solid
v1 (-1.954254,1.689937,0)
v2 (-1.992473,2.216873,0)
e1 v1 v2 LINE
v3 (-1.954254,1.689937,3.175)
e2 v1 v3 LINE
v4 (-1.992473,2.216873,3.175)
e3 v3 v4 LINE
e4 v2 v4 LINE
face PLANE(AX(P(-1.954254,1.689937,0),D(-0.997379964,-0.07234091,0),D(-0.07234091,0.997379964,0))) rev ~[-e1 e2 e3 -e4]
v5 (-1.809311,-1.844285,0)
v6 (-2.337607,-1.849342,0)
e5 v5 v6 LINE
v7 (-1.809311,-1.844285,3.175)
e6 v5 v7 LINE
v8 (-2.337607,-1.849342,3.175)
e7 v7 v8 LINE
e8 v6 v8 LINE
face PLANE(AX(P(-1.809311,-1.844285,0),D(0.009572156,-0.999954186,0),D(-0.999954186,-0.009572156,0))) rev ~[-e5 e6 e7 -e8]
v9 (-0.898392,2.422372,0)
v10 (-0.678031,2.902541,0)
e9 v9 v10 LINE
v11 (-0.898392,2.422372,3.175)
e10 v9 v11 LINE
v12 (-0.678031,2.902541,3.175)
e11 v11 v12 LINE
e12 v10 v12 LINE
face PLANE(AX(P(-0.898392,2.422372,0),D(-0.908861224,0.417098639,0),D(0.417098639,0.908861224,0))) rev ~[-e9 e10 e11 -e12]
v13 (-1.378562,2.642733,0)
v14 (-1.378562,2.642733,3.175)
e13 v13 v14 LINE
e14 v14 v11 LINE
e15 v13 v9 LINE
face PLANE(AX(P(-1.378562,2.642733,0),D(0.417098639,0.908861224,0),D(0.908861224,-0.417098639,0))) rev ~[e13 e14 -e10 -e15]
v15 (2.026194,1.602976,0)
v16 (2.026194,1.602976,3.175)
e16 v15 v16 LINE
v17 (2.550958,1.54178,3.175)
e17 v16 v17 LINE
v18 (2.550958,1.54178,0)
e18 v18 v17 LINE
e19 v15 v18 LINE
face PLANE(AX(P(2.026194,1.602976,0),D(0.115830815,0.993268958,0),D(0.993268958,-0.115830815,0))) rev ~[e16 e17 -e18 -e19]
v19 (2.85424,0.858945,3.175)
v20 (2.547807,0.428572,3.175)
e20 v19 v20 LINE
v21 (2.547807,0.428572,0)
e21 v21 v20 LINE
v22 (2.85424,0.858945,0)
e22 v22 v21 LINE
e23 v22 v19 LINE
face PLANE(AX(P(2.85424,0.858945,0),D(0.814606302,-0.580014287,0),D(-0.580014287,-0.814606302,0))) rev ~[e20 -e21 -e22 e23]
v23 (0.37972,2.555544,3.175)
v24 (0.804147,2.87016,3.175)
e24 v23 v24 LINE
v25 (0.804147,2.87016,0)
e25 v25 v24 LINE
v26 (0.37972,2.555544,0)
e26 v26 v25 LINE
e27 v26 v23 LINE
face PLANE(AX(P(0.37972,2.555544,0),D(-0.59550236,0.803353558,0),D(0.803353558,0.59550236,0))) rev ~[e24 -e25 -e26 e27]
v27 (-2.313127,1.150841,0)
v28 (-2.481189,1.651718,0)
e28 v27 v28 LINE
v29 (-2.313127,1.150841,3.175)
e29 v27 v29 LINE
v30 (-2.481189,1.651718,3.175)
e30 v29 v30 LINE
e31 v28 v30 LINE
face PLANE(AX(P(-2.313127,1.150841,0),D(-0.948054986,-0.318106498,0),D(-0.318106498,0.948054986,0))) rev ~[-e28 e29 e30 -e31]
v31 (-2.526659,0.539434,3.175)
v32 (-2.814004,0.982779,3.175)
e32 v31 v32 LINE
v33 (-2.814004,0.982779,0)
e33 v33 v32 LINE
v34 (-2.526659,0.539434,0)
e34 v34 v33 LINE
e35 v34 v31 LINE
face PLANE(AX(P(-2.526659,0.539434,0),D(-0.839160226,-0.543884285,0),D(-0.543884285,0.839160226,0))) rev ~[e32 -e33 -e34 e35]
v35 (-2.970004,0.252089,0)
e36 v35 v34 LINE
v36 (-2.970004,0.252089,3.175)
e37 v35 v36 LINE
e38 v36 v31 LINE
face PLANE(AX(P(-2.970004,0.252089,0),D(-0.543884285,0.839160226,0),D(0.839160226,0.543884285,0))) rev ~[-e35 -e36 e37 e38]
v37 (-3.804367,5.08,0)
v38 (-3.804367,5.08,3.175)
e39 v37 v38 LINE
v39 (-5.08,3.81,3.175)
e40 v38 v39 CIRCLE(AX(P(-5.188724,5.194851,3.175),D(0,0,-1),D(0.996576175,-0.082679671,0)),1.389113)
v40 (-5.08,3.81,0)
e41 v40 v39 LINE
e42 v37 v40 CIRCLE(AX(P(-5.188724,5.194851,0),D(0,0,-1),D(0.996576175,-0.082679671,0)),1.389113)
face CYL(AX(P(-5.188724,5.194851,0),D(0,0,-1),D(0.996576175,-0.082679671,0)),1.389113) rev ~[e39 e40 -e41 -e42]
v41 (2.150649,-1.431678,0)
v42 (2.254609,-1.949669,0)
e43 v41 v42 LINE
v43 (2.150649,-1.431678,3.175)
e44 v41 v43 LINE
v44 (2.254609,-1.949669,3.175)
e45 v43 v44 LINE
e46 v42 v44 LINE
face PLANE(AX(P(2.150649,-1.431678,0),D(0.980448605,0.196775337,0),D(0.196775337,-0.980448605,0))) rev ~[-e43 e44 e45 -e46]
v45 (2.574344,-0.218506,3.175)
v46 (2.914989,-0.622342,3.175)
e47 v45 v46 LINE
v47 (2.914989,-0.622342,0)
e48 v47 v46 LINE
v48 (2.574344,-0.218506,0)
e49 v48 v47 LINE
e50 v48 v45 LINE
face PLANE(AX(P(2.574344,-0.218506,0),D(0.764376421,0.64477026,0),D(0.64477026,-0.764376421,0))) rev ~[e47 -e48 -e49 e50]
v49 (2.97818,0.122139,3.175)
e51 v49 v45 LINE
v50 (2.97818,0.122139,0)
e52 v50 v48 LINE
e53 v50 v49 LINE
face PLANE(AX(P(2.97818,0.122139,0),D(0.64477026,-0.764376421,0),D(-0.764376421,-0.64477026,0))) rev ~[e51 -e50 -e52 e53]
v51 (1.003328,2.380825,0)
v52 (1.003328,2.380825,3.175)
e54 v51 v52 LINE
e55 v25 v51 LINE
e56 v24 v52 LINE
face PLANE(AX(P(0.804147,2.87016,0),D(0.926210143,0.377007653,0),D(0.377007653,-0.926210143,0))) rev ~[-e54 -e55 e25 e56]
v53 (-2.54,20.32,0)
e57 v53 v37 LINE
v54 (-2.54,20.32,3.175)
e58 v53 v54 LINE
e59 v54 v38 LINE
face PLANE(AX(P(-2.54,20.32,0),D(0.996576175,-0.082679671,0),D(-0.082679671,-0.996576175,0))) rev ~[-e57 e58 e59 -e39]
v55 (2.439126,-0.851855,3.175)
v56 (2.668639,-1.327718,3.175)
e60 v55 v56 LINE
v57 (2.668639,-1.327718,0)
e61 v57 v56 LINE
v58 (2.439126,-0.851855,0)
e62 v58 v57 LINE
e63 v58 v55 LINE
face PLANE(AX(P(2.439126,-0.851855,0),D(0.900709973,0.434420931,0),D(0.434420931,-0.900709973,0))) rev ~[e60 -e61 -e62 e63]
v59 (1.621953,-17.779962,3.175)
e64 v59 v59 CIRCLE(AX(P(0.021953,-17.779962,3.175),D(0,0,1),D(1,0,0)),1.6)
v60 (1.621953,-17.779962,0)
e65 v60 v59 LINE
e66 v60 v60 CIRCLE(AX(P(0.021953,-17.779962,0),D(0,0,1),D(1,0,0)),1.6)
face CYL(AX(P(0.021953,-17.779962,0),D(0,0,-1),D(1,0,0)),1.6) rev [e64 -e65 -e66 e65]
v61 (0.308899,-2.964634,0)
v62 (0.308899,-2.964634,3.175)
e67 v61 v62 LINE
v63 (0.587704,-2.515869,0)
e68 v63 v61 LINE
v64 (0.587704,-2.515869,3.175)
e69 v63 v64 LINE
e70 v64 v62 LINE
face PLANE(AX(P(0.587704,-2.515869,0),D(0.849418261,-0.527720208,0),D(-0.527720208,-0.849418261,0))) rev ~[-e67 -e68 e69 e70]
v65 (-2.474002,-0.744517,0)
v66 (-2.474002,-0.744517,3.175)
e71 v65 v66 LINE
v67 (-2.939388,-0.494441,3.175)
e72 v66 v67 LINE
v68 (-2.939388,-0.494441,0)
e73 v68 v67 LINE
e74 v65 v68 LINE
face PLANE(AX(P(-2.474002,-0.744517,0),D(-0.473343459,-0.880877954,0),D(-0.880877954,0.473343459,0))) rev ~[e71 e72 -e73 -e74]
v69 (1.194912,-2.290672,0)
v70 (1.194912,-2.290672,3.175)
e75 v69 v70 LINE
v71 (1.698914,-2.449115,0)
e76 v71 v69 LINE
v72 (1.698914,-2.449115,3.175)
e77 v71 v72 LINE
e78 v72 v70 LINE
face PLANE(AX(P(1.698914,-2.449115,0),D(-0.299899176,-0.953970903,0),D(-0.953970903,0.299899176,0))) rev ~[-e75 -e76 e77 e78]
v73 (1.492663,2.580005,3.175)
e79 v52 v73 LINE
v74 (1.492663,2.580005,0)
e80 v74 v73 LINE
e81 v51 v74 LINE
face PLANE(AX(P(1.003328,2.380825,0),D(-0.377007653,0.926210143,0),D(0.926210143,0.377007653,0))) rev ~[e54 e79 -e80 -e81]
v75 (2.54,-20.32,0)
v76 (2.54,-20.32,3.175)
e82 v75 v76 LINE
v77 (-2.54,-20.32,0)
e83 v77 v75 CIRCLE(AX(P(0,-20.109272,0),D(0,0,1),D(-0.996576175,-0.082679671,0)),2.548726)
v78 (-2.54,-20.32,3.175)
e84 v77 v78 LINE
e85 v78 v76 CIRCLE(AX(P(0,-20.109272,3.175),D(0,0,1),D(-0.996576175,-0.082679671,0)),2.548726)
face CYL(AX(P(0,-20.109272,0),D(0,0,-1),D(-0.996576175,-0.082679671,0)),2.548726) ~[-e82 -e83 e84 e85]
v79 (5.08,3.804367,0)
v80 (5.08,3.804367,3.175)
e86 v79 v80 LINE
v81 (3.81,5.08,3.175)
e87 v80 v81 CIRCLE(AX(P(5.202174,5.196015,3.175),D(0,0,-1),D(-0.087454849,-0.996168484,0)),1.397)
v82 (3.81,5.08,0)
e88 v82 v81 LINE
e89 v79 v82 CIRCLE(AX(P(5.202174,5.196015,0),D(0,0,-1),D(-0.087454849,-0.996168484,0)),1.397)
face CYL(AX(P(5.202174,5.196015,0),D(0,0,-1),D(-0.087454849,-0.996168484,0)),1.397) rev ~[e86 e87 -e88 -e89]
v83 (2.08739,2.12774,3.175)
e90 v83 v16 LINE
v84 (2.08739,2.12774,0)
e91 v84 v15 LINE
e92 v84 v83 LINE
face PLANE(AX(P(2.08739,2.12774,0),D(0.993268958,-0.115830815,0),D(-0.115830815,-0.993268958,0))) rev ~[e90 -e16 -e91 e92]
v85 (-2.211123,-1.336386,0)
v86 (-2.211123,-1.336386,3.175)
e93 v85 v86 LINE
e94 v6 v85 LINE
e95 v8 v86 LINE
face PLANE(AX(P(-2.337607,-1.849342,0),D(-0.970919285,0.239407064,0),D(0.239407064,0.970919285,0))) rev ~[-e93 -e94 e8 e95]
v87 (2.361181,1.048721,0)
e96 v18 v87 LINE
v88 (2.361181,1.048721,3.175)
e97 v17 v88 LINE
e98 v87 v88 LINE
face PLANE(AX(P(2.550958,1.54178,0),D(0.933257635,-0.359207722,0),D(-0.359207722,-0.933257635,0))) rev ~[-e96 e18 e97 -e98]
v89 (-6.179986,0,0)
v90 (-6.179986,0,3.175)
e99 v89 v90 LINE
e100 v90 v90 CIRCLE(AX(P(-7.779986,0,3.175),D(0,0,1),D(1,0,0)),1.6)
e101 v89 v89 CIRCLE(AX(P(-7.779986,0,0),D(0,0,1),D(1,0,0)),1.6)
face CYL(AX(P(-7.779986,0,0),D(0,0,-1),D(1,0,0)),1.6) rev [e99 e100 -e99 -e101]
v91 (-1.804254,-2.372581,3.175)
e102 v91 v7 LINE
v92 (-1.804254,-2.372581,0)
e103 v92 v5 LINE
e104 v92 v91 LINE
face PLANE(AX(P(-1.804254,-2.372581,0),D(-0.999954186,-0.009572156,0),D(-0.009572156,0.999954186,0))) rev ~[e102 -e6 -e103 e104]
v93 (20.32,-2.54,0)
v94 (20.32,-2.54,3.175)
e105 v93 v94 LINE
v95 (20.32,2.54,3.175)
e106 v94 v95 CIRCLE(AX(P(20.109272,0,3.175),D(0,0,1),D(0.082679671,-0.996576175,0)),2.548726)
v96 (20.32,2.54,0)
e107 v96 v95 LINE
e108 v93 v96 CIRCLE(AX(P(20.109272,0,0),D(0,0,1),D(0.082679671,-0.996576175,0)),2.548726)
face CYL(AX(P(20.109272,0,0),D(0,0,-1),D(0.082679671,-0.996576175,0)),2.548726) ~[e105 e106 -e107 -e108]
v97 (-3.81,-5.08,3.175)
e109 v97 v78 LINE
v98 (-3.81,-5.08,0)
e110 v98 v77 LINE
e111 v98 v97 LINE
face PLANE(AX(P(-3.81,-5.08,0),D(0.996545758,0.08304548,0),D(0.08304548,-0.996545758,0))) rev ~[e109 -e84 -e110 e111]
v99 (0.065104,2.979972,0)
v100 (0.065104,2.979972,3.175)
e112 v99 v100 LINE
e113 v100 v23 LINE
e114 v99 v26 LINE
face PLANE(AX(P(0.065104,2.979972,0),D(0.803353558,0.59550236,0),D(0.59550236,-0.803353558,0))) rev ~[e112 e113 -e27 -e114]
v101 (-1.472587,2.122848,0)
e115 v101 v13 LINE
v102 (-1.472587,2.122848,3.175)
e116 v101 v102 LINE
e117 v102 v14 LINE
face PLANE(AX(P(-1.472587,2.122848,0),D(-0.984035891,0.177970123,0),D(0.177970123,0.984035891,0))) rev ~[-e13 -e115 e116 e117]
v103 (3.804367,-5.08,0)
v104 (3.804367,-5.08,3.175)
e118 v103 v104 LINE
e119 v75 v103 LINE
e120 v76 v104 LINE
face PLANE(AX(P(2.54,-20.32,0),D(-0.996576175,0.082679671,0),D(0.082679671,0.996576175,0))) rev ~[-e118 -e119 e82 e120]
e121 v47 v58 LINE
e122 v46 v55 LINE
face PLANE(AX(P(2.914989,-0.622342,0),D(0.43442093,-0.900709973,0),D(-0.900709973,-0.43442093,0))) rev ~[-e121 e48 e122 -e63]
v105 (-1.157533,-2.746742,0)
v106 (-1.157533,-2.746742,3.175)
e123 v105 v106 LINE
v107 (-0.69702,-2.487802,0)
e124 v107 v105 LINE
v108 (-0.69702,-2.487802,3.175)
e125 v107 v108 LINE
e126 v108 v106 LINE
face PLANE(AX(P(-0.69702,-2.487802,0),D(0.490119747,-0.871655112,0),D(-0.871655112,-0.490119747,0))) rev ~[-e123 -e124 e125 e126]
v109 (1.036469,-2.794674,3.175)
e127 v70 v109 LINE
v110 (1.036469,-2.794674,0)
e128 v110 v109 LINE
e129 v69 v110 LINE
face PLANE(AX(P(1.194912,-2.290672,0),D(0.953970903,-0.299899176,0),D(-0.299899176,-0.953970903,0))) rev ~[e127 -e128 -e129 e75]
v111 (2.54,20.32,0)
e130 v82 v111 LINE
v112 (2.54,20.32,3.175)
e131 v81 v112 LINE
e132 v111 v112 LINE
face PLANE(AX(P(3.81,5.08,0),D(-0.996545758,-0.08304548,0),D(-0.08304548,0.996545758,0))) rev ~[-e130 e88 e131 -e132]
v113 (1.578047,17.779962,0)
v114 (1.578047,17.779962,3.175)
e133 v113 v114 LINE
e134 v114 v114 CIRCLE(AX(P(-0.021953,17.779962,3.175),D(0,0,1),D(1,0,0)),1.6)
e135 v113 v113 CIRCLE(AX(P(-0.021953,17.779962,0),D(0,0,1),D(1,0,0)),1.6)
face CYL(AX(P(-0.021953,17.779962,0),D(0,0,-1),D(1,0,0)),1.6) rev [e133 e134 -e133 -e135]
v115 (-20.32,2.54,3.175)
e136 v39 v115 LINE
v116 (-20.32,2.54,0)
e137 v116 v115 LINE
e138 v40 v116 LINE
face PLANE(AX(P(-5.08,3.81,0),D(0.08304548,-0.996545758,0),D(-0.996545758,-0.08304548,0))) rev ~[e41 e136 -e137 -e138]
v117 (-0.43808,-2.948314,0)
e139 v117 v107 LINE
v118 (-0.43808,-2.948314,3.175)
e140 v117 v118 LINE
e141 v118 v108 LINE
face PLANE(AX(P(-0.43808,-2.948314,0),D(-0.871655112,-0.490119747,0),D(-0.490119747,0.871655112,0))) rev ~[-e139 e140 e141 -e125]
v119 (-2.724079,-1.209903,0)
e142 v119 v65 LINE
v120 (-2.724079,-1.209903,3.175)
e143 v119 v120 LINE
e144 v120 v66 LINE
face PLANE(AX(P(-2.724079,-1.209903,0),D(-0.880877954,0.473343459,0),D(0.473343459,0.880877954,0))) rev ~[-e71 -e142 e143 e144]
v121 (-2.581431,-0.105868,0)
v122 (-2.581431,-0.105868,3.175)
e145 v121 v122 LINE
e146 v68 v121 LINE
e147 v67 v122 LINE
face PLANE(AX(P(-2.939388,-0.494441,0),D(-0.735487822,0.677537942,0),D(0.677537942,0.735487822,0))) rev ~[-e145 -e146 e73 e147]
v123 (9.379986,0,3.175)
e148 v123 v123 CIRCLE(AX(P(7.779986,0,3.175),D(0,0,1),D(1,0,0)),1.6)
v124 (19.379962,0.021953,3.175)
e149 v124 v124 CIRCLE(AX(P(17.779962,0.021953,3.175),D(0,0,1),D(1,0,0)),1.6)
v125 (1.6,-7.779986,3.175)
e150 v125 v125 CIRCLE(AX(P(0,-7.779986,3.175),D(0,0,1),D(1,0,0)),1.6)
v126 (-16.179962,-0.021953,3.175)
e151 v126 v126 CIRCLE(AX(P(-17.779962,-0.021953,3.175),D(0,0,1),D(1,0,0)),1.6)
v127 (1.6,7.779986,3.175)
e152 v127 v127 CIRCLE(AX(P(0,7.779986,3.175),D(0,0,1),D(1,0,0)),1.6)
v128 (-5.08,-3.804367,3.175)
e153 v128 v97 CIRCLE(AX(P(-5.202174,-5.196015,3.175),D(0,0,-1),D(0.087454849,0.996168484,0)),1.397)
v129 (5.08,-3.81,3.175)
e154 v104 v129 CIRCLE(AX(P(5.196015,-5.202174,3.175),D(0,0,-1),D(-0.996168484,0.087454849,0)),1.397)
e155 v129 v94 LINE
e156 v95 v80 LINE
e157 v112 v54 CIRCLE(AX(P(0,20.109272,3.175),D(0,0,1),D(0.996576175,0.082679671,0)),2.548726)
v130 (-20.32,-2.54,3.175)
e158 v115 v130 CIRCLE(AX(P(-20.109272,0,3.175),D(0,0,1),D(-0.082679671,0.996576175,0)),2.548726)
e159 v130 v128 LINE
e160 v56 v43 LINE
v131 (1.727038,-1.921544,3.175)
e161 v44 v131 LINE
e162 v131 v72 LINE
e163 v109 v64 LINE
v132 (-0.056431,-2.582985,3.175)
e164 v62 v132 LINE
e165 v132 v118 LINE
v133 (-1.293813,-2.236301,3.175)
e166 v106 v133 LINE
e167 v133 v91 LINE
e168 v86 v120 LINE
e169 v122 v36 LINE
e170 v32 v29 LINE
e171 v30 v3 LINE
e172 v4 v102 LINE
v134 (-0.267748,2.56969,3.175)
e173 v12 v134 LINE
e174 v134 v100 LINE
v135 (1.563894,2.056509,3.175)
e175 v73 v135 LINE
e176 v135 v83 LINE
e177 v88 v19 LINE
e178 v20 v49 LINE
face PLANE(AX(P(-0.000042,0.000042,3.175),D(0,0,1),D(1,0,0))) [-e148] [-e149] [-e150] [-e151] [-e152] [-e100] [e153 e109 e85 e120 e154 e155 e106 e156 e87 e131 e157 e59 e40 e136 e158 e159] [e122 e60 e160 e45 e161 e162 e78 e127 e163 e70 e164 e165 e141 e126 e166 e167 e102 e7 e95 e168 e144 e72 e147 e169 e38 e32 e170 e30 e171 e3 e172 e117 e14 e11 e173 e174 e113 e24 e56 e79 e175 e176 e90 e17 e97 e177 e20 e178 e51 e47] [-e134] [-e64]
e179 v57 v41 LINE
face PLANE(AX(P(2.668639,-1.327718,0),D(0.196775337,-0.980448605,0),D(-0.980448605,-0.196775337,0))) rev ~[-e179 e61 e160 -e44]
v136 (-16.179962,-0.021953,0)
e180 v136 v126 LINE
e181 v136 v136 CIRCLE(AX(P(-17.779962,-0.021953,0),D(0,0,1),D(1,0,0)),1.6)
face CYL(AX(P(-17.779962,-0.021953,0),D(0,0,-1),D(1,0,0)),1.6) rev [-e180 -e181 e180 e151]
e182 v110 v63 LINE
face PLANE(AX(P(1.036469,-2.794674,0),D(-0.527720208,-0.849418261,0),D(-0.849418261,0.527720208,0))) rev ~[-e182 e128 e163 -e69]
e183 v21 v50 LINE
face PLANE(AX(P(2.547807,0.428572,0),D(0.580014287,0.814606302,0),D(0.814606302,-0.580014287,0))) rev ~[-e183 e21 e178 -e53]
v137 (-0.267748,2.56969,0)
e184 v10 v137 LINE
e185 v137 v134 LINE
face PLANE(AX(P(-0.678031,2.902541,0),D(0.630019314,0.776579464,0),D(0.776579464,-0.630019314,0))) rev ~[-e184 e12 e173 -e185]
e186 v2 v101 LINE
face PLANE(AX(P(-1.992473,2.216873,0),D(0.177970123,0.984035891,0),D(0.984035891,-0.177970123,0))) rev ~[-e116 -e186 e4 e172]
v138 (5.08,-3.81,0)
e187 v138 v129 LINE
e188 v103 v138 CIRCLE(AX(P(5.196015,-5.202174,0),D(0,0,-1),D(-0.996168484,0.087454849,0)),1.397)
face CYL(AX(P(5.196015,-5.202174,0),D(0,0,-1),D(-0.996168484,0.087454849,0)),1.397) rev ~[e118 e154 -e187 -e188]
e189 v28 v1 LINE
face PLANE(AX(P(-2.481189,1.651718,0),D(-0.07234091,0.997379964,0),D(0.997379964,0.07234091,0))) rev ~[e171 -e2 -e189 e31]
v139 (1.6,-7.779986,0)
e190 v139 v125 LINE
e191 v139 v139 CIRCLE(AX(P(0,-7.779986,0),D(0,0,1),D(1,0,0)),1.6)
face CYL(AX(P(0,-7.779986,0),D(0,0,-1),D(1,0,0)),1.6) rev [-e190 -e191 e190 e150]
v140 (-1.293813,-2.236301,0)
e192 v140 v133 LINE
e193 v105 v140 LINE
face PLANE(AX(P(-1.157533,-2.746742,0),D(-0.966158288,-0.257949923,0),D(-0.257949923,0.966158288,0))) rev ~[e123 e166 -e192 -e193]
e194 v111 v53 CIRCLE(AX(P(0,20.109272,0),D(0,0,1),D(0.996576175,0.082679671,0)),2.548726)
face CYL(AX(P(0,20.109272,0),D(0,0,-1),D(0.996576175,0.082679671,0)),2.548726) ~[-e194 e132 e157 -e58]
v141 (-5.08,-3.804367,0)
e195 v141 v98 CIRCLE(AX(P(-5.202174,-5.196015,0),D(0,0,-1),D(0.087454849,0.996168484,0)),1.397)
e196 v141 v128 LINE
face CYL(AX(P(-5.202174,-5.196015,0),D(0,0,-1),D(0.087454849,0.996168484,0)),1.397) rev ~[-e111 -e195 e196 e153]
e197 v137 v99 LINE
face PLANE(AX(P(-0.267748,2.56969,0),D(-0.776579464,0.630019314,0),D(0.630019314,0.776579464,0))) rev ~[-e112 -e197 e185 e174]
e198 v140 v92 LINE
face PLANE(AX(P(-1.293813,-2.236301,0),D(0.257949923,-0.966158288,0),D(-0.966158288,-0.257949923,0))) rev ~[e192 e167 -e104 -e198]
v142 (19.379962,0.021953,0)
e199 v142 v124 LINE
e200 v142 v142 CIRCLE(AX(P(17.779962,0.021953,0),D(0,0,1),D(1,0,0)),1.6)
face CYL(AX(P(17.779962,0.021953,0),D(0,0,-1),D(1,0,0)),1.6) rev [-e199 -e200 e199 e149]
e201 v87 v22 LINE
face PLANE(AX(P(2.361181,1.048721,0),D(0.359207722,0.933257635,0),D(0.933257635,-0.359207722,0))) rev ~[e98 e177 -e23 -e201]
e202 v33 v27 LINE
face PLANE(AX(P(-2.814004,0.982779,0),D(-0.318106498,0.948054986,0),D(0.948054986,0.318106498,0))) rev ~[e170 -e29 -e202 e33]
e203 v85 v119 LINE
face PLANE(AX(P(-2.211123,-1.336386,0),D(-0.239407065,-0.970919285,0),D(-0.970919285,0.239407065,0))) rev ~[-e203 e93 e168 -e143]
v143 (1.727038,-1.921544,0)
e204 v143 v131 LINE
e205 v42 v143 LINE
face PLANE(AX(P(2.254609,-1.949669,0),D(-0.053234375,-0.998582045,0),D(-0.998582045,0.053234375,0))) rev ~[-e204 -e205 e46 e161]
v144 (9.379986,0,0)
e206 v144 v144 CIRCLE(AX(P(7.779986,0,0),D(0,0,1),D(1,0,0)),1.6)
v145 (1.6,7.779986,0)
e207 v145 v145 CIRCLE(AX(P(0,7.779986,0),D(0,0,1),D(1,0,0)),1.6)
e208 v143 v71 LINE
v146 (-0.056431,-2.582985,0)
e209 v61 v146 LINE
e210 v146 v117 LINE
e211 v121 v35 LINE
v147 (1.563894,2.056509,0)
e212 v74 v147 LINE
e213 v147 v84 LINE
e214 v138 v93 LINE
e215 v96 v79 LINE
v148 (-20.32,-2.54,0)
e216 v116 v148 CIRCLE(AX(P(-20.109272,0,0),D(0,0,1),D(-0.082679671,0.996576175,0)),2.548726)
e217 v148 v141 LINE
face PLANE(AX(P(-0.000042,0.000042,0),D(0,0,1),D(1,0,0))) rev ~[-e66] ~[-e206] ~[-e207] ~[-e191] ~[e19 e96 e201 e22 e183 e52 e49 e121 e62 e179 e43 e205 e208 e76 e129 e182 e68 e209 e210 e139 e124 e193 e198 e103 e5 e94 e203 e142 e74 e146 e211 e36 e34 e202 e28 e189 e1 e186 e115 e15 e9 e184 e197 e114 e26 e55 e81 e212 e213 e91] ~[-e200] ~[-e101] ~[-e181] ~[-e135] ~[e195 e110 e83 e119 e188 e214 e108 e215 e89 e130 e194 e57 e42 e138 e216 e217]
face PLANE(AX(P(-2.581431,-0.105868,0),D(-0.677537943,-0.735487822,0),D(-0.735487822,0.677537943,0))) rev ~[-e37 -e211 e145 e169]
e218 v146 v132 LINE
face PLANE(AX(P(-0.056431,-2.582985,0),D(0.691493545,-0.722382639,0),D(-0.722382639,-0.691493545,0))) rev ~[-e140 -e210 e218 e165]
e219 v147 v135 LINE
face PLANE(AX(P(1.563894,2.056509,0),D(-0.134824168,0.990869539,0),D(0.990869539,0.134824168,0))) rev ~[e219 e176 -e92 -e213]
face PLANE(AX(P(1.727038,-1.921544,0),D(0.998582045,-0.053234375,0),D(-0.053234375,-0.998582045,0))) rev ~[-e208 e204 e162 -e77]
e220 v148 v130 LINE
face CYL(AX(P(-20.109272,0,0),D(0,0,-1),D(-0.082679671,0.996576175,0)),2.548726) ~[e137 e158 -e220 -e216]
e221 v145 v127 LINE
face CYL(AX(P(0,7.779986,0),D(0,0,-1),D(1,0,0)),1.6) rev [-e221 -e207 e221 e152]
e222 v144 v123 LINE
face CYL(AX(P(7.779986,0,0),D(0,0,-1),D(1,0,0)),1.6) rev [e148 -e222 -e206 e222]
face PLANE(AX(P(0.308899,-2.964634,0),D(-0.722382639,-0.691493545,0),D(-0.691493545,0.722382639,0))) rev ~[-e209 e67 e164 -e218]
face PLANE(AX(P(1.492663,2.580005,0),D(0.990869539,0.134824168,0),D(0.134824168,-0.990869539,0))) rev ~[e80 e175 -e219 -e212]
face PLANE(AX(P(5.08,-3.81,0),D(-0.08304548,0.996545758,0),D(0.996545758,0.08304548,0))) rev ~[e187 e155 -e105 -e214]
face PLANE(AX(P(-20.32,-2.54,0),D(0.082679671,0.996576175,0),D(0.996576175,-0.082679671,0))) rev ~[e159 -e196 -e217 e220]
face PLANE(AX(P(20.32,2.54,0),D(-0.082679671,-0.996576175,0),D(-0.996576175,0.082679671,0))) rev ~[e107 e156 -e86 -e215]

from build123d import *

# Parameters (mm, degrees)
F0_R     = 1.6
F1_DEPTH = 3.175


# Not quite as in the source:
# - a length typed as a fraction of an inch, garbled in the dataset ("3 / 203.2 mm" for 3/8 in), is restored


with BuildPart() as f1:
    # F0 (on Top) → F1 (new body)
    with BuildSketch(Plane.XY):
        with BuildLine():
            ThreePointArc((-3.8043671626, 5.08), (-4.2086486587, 4.2104292787), (-5.08, 3.81))
            Line((-5.08, 3.81), (-20.32, 2.54))
            ThreePointArc((-20.32, 2.54), (-22.6579985335, 0), (-20.32, -2.54))
            Line((-20.32, -2.54), (-5.08, -3.8043671626))
            ThreePointArc((-5.08, -3.8043671626), (-4.2121628624, -4.2103745873), (-3.81, -5.08))
            Line((-3.81, -5.08), (-2.54, -20.32))
            ThreePointArc((-2.54, -20.32), (0, -22.6579985335), (2.54, -20.32))
            Line((2.54, -20.32), (3.8043671626, -5.08))
            ThreePointArc((3.8043671626, -5.08), (4.2103745873, -4.2121628624), (5.08, -3.81))
            Line((5.08, -3.81), (20.32, -2.54))
            ThreePointArc((20.32, -2.54), (22.6579985335, 0), (20.32, 2.54))
            Line((20.32, 2.54), (5.08, 3.8043671626))
            ThreePointArc((5.08, 3.8043671626), (4.2121628624, 4.2103745873), (3.81, 5.08))
            Line((3.81, 5.08), (2.54, 20.32))
            ThreePointArc((2.54, 20.32), (0, 22.6579985335), (-2.54, 20.32))
            Line((-2.54, 20.32), (-3.8043671626, 5.08))
        make_face()
        with Locations((-17.7799620532, -0.0219527348)):
            Circle(F0_R, mode=Mode.SUBTRACT)
        with Locations((-7.7799861494, 0)):
            Circle(F0_R, mode=Mode.SUBTRACT)
        with Locations((0.0219527348, -17.7799620532)):
            Circle(F0_R, mode=Mode.SUBTRACT)
        with Locations((0, -7.7799861494)):
            Circle(F0_R, mode=Mode.SUBTRACT)
        with Locations((7.7799861494, 0)):
            Circle(F0_R, mode=Mode.SUBTRACT)
        with Locations((-0.0219527348, 17.7799620532)):
            Circle(F0_R, mode=Mode.SUBTRACT)
        Polygon((-2.3131272616, 1.150841372), (-2.4811892868, 1.651717782), (-1.9542535042, 1.6899369317), (-1.992472654, 2.2168727143), (-1.4725868119, 2.1228475389), (-1.3785616365, 2.6427333809), (-0.8983920744, 2.4223718279), (-0.6780305213, 2.90254139), (-0.2677480588, 2.5696895861), (0.0651037451, 2.9799720486), (0.379719552, 2.555544297), (0.8041473037, 2.8701601039), (1.0033279869, 2.380824761), (1.4926633298, 2.5800054442), (1.5638936344, 2.0565092492), (2.0873898293, 2.1277395538), (2.0261940932, 1.6029756981), (2.5509579489, 1.5417799619), (2.3611813253, 1.0487212884), (2.8542399989, 0.8589446648), (2.547806851, 0.4285718633), (2.9781796525, 0.1221387154), (2.574344302, -0.2185063082), (2.9149893256, -0.6223416587), (2.4391262327, -0.8518549247), (2.6686394987, -1.3277180175), (2.1506488918, -1.4316783634), (2.2546092377, -1.9496689703), (1.7270383715, -1.9215441851), (1.6989135863, -2.4491150513), (1.1949116786, -2.2906723188), (1.0364689461, -2.7946742265), (0.5877042905, -2.5158690862), (0.3088991502, -2.9646337418), (-0.0564307197, -2.5829845462), (-0.4380799154, -2.9483144161), (-0.6970199802, -2.4878015876), (-1.1575328087, -2.7467416524), (-1.2938129119, -2.2363009057), (-1.8042536586, -2.3725810089), (-1.80931082, -1.8442852134), (-2.3376066155, -1.8493423749), (-2.2111230752, -1.3363862984), (-2.7240791517, -1.209902758), (-2.4740023355, -0.7445173173), (-2.9393877762, -0.4944405012), (-2.5814309304, -0.105867575), (-2.9700038565, 0.2520892708), (-2.5266587261, 0.5394342163), (-2.8140036716, 0.9827793468), align=None, mode=Mode.SUBTRACT)
        with Locations((0, 7.7799861494)):
            Circle(F0_R, mode=Mode.SUBTRACT)
        with Locations((17.7799620532, 0.0219527348)):
            Circle(F0_R, mode=Mode.SUBTRACT)
    extrude(amount=F1_DEPTH)


solid = f1.part
